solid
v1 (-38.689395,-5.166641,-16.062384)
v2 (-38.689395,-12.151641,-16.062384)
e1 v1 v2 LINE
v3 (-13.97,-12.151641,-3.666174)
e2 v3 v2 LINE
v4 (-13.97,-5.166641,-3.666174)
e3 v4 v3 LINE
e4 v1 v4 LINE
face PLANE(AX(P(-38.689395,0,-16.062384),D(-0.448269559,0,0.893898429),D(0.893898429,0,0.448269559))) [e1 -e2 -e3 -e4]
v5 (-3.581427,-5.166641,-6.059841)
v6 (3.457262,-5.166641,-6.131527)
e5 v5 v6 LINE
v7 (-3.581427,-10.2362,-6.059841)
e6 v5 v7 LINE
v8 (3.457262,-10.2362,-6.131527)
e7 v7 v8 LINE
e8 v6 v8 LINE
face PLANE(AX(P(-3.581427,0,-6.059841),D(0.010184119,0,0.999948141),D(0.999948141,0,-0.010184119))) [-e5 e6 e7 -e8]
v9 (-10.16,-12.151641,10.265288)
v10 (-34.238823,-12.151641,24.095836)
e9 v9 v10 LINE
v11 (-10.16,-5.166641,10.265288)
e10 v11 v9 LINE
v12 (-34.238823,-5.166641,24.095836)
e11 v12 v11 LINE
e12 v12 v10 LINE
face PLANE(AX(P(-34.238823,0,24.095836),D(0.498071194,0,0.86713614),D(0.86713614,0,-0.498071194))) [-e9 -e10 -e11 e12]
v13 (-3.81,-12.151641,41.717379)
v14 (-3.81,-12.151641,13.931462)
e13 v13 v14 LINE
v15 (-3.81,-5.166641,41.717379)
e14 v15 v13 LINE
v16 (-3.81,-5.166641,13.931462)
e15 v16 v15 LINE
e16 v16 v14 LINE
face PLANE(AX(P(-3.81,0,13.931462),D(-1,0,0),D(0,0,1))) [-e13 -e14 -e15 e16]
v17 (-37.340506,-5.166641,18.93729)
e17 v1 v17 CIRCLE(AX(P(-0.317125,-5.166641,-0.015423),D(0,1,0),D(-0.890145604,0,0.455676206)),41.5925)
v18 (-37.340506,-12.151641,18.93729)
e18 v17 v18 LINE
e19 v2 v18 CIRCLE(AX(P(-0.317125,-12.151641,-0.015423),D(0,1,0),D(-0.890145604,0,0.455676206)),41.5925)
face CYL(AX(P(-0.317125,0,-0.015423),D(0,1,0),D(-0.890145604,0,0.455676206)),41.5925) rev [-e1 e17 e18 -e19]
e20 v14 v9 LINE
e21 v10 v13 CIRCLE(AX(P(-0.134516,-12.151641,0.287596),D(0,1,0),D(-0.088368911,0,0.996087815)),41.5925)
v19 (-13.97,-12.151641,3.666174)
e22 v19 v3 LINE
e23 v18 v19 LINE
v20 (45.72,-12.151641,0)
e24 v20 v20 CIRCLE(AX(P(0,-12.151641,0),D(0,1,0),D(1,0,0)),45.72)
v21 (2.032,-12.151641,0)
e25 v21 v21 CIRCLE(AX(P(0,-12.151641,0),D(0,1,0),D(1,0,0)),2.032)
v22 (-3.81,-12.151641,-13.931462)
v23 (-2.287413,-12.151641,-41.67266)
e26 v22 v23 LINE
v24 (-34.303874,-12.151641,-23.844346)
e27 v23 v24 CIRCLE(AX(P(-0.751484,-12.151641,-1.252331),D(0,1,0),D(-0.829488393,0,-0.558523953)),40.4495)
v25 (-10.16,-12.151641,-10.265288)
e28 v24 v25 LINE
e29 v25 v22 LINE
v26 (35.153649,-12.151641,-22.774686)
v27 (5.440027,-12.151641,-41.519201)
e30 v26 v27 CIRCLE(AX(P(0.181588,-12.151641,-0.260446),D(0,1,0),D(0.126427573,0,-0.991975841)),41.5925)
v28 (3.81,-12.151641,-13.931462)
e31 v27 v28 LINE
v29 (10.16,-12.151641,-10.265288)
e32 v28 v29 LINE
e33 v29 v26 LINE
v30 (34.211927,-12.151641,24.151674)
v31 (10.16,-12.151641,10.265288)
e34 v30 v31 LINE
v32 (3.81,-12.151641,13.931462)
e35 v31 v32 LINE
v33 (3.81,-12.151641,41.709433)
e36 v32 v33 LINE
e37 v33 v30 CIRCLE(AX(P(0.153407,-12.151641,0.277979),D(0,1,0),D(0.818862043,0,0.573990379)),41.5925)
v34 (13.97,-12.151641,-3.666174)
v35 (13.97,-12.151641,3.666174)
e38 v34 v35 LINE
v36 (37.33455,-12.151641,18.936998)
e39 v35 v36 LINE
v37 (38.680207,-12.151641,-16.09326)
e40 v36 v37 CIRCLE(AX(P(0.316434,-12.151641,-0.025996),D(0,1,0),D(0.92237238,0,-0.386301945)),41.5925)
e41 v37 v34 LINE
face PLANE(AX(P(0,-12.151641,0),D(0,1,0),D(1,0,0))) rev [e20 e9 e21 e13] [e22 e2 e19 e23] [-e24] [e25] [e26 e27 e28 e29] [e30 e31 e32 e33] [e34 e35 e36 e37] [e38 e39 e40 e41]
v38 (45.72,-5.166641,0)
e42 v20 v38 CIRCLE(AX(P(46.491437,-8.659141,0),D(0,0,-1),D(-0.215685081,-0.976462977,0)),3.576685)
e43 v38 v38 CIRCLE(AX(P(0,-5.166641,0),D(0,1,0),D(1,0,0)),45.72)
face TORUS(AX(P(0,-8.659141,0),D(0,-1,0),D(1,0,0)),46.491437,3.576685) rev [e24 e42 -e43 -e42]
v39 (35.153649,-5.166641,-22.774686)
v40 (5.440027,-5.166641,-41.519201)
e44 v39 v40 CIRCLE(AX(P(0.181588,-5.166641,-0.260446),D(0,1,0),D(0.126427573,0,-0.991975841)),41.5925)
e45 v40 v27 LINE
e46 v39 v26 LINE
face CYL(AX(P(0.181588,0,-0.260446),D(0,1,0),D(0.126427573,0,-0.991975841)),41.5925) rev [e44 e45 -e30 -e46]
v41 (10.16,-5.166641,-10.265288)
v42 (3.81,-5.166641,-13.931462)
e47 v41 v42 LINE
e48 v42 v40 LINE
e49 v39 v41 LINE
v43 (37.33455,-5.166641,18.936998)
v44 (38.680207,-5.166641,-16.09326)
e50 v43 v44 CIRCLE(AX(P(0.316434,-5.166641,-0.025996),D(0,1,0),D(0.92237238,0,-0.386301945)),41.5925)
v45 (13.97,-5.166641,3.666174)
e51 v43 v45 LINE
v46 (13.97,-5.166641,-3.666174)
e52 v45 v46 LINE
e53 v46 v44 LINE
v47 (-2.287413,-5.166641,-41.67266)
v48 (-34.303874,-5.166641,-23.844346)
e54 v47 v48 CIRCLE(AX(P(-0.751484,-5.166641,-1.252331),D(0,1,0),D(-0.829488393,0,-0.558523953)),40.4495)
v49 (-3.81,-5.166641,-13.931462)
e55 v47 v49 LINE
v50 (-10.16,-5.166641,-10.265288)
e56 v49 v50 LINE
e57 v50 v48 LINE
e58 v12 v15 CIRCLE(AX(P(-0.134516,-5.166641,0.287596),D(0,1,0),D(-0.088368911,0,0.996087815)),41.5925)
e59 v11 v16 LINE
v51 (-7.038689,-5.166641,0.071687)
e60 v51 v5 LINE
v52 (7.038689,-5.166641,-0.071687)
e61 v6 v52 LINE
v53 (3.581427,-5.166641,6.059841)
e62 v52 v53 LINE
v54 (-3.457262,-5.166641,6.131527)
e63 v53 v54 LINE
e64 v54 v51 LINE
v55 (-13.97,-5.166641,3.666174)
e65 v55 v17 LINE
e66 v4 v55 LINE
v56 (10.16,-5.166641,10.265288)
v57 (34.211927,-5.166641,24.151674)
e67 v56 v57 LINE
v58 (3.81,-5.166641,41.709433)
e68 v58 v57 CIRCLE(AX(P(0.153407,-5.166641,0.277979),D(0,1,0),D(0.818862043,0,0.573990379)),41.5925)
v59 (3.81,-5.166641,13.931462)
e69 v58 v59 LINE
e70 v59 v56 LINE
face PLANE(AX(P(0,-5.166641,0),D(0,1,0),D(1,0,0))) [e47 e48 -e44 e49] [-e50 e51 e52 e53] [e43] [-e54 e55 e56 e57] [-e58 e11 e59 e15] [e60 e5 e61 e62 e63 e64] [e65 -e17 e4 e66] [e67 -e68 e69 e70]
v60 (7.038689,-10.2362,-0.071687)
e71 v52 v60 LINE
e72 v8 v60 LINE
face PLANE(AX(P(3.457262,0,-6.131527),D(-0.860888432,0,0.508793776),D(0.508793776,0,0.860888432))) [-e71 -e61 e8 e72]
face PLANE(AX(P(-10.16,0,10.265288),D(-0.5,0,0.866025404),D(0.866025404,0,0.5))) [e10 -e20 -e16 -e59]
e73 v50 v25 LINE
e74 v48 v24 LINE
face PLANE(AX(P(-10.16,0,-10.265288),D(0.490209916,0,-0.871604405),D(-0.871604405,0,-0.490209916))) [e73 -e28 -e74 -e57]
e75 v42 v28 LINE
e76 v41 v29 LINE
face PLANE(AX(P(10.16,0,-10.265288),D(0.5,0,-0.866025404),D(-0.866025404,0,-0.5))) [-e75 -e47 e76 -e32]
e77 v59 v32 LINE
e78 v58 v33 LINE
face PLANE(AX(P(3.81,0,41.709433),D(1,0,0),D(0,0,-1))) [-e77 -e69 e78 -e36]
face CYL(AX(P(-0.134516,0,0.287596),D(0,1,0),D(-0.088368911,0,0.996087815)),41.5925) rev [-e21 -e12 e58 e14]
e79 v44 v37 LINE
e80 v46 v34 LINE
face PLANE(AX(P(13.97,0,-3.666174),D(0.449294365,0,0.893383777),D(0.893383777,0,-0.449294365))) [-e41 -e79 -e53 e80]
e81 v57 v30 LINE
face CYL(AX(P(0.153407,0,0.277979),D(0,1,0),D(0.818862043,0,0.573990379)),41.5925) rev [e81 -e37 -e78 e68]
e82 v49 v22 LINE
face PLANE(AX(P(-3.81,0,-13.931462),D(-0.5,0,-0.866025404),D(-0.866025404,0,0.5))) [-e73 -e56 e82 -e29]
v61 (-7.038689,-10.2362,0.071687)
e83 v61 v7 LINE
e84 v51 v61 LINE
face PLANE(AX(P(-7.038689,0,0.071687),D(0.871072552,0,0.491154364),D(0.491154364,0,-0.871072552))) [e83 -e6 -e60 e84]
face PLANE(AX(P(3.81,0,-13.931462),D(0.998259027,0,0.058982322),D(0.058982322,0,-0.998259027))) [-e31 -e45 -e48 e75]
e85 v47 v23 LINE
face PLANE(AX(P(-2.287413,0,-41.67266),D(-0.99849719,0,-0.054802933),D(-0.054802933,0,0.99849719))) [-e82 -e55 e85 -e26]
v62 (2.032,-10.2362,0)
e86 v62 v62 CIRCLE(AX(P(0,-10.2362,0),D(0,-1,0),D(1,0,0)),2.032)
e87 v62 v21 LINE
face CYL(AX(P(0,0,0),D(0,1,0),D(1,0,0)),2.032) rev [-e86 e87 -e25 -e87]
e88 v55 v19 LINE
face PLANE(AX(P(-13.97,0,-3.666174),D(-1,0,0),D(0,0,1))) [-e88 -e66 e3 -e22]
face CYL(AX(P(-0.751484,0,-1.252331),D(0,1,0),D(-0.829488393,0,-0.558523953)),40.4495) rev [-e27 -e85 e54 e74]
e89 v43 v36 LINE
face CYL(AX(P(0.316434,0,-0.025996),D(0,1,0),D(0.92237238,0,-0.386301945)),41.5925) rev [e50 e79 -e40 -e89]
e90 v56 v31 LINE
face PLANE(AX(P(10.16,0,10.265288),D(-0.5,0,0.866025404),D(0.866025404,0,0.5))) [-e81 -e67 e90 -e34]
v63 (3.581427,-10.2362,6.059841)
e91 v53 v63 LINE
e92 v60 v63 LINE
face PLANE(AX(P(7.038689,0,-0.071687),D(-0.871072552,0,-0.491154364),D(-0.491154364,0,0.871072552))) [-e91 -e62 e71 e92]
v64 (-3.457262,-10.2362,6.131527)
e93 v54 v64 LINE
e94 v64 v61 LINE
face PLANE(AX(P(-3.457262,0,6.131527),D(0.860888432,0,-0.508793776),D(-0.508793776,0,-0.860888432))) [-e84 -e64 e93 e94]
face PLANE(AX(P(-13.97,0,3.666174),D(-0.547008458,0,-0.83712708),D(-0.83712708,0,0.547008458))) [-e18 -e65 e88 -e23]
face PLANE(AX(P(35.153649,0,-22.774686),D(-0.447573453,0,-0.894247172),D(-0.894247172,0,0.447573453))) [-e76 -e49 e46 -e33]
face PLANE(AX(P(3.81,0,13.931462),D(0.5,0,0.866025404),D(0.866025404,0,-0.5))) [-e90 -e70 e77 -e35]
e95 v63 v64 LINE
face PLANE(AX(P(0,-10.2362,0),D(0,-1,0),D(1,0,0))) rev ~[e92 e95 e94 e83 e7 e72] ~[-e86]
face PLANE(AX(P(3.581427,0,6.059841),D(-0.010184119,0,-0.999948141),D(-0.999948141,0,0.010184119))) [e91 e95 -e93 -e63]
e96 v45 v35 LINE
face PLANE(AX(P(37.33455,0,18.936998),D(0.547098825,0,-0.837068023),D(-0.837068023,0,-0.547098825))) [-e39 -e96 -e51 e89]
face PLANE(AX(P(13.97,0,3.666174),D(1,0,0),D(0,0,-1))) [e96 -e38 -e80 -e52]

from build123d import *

# Parameters (mm, degrees)
F2_R     = 2.032
F3_DEPTH = 15.875
F4_DEPTH = 10.2362


# Not quite as in the source:
# - a feature names something its author has since deleted; it is built from what else it names


with BuildPart() as f1:
    # F0 (on Top) → F1 (revolve)
    with BuildSketch(Plane.XY):
        with BuildLine():
            Line((0, -5.1666409709), (0, -12.1516409709))
            Line((0, -12.1516409709), (45.72, -12.1516409709))
            ThreePointArc((45.72, -12.1516409709), (42.9147529825, -8.6591409709), (45.72, -5.1666409709))
            Line((45.72, -5.1666409709), (0, -5.1666409709))
        make_face()
    revolve(axis=Axis((0, -8.561744864, 0), (0, 1, 0)))

    # F2 (on Front) → F3 (cut)
    with BuildSketch(Plane.XZ):
        with BuildLine():
            Line((13.97, 3.6661742094), (13.97, -3.6661742094))
            Line((13.97, -3.6661742094), (38.6802071591, -16.0932599922))
            ThreePointArc((38.6802071591, -16.0932599922), (41.8782799617, 1.5705660984), (37.3345500424, 18.9369975174))
            Line((37.3345500424, 18.9369975174), (13.97, 3.6661742094))
        make_face()
        with BuildLine():
            Line((3.81, 41.7094333604), (3.81, 13.9314619955))
            Line((3.81, 13.9314619955), (10.16, 10.2652877862))
            Line((10.16, 10.2652877862), (34.2119266748, 24.1516741264))
            ThreePointArc((34.2119266748, 24.1516741264), (20.9542761873, 36.2954737188), (3.81, 41.7094333604))
        make_face()
        with BuildLine():
            Line((-34.2388233597, 24.0958361272), (-10.16, 10.2652877862))
            Line((-10.16, 10.2652877862), (-3.81, 13.9314619955))
            Line((-3.81, 13.9314619955), (-3.81, 41.7173788368))
            ThreePointArc((-3.81, 41.7173788368), (-20.9781685322, 36.2803485402), (-34.2388233597, 24.0958361272))
        make_face()
        with BuildLine():
            Line((-38.6893950171, -16.0623838358), (-13.97, -3.6661742094))
            Line((-13.97, -3.6661742094), (-13.97, 3.6661742094))
            Line((-13.97, 3.6661742094), (-37.3405062231, 18.9372899969))
            ThreePointArc((-37.3405062231, 18.9372899969), (-41.8787701809, 1.5863648371), (-38.6893950171, -16.0623838358))
        make_face()
        with BuildLine():
            Line((-3.81, -13.9314619955), (-10.16, -10.2652877862))
            Line((-10.16, -10.2652877862), (-34.3038742814, -23.844345572))
            ThreePointArc((-34.3038742814, -23.844345572), (-20.4303998238, -36.5921428083), (-2.2874128339, -41.6726596109))
            Line((-2.2874128339, -41.6726596109), (-3.81, -13.9314619955))
        make_face()
        with BuildLine():
            Line((10.16, -10.2652877862), (3.81, -13.9314619955))
            Line((3.81, -13.9314619955), (5.4400267393, -41.5192010913))
            ThreePointArc((5.4400267393, -41.5192010913), (22.3730839146, -35.4381883413), (35.1536490306, -22.7746857971))
            Line((35.1536490306, -22.7746857971), (10.16, -10.2652877862))
        make_face()
        Circle(F2_R)
    extrude(amount=F3_DEPTH, mode=Mode.SUBTRACT)

    # F2 (on Front) → F4 (cut)
    with BuildSketch(Plane.XZ):
        Polygon((-7.0386894402, 0.071686571), (-3.5814271117, -6.059840579), (3.4572623285, -6.1315271501), (7.0386894402, -0.071686571), (3.5814271117, 6.059840579), (-3.4572623285, 6.1315271501), align=None)
        Circle(F2_R, mode=Mode.SUBTRACT)
    extrude(amount=F4_DEPTH, mode=Mode.SUBTRACT)


solid = f1.part
